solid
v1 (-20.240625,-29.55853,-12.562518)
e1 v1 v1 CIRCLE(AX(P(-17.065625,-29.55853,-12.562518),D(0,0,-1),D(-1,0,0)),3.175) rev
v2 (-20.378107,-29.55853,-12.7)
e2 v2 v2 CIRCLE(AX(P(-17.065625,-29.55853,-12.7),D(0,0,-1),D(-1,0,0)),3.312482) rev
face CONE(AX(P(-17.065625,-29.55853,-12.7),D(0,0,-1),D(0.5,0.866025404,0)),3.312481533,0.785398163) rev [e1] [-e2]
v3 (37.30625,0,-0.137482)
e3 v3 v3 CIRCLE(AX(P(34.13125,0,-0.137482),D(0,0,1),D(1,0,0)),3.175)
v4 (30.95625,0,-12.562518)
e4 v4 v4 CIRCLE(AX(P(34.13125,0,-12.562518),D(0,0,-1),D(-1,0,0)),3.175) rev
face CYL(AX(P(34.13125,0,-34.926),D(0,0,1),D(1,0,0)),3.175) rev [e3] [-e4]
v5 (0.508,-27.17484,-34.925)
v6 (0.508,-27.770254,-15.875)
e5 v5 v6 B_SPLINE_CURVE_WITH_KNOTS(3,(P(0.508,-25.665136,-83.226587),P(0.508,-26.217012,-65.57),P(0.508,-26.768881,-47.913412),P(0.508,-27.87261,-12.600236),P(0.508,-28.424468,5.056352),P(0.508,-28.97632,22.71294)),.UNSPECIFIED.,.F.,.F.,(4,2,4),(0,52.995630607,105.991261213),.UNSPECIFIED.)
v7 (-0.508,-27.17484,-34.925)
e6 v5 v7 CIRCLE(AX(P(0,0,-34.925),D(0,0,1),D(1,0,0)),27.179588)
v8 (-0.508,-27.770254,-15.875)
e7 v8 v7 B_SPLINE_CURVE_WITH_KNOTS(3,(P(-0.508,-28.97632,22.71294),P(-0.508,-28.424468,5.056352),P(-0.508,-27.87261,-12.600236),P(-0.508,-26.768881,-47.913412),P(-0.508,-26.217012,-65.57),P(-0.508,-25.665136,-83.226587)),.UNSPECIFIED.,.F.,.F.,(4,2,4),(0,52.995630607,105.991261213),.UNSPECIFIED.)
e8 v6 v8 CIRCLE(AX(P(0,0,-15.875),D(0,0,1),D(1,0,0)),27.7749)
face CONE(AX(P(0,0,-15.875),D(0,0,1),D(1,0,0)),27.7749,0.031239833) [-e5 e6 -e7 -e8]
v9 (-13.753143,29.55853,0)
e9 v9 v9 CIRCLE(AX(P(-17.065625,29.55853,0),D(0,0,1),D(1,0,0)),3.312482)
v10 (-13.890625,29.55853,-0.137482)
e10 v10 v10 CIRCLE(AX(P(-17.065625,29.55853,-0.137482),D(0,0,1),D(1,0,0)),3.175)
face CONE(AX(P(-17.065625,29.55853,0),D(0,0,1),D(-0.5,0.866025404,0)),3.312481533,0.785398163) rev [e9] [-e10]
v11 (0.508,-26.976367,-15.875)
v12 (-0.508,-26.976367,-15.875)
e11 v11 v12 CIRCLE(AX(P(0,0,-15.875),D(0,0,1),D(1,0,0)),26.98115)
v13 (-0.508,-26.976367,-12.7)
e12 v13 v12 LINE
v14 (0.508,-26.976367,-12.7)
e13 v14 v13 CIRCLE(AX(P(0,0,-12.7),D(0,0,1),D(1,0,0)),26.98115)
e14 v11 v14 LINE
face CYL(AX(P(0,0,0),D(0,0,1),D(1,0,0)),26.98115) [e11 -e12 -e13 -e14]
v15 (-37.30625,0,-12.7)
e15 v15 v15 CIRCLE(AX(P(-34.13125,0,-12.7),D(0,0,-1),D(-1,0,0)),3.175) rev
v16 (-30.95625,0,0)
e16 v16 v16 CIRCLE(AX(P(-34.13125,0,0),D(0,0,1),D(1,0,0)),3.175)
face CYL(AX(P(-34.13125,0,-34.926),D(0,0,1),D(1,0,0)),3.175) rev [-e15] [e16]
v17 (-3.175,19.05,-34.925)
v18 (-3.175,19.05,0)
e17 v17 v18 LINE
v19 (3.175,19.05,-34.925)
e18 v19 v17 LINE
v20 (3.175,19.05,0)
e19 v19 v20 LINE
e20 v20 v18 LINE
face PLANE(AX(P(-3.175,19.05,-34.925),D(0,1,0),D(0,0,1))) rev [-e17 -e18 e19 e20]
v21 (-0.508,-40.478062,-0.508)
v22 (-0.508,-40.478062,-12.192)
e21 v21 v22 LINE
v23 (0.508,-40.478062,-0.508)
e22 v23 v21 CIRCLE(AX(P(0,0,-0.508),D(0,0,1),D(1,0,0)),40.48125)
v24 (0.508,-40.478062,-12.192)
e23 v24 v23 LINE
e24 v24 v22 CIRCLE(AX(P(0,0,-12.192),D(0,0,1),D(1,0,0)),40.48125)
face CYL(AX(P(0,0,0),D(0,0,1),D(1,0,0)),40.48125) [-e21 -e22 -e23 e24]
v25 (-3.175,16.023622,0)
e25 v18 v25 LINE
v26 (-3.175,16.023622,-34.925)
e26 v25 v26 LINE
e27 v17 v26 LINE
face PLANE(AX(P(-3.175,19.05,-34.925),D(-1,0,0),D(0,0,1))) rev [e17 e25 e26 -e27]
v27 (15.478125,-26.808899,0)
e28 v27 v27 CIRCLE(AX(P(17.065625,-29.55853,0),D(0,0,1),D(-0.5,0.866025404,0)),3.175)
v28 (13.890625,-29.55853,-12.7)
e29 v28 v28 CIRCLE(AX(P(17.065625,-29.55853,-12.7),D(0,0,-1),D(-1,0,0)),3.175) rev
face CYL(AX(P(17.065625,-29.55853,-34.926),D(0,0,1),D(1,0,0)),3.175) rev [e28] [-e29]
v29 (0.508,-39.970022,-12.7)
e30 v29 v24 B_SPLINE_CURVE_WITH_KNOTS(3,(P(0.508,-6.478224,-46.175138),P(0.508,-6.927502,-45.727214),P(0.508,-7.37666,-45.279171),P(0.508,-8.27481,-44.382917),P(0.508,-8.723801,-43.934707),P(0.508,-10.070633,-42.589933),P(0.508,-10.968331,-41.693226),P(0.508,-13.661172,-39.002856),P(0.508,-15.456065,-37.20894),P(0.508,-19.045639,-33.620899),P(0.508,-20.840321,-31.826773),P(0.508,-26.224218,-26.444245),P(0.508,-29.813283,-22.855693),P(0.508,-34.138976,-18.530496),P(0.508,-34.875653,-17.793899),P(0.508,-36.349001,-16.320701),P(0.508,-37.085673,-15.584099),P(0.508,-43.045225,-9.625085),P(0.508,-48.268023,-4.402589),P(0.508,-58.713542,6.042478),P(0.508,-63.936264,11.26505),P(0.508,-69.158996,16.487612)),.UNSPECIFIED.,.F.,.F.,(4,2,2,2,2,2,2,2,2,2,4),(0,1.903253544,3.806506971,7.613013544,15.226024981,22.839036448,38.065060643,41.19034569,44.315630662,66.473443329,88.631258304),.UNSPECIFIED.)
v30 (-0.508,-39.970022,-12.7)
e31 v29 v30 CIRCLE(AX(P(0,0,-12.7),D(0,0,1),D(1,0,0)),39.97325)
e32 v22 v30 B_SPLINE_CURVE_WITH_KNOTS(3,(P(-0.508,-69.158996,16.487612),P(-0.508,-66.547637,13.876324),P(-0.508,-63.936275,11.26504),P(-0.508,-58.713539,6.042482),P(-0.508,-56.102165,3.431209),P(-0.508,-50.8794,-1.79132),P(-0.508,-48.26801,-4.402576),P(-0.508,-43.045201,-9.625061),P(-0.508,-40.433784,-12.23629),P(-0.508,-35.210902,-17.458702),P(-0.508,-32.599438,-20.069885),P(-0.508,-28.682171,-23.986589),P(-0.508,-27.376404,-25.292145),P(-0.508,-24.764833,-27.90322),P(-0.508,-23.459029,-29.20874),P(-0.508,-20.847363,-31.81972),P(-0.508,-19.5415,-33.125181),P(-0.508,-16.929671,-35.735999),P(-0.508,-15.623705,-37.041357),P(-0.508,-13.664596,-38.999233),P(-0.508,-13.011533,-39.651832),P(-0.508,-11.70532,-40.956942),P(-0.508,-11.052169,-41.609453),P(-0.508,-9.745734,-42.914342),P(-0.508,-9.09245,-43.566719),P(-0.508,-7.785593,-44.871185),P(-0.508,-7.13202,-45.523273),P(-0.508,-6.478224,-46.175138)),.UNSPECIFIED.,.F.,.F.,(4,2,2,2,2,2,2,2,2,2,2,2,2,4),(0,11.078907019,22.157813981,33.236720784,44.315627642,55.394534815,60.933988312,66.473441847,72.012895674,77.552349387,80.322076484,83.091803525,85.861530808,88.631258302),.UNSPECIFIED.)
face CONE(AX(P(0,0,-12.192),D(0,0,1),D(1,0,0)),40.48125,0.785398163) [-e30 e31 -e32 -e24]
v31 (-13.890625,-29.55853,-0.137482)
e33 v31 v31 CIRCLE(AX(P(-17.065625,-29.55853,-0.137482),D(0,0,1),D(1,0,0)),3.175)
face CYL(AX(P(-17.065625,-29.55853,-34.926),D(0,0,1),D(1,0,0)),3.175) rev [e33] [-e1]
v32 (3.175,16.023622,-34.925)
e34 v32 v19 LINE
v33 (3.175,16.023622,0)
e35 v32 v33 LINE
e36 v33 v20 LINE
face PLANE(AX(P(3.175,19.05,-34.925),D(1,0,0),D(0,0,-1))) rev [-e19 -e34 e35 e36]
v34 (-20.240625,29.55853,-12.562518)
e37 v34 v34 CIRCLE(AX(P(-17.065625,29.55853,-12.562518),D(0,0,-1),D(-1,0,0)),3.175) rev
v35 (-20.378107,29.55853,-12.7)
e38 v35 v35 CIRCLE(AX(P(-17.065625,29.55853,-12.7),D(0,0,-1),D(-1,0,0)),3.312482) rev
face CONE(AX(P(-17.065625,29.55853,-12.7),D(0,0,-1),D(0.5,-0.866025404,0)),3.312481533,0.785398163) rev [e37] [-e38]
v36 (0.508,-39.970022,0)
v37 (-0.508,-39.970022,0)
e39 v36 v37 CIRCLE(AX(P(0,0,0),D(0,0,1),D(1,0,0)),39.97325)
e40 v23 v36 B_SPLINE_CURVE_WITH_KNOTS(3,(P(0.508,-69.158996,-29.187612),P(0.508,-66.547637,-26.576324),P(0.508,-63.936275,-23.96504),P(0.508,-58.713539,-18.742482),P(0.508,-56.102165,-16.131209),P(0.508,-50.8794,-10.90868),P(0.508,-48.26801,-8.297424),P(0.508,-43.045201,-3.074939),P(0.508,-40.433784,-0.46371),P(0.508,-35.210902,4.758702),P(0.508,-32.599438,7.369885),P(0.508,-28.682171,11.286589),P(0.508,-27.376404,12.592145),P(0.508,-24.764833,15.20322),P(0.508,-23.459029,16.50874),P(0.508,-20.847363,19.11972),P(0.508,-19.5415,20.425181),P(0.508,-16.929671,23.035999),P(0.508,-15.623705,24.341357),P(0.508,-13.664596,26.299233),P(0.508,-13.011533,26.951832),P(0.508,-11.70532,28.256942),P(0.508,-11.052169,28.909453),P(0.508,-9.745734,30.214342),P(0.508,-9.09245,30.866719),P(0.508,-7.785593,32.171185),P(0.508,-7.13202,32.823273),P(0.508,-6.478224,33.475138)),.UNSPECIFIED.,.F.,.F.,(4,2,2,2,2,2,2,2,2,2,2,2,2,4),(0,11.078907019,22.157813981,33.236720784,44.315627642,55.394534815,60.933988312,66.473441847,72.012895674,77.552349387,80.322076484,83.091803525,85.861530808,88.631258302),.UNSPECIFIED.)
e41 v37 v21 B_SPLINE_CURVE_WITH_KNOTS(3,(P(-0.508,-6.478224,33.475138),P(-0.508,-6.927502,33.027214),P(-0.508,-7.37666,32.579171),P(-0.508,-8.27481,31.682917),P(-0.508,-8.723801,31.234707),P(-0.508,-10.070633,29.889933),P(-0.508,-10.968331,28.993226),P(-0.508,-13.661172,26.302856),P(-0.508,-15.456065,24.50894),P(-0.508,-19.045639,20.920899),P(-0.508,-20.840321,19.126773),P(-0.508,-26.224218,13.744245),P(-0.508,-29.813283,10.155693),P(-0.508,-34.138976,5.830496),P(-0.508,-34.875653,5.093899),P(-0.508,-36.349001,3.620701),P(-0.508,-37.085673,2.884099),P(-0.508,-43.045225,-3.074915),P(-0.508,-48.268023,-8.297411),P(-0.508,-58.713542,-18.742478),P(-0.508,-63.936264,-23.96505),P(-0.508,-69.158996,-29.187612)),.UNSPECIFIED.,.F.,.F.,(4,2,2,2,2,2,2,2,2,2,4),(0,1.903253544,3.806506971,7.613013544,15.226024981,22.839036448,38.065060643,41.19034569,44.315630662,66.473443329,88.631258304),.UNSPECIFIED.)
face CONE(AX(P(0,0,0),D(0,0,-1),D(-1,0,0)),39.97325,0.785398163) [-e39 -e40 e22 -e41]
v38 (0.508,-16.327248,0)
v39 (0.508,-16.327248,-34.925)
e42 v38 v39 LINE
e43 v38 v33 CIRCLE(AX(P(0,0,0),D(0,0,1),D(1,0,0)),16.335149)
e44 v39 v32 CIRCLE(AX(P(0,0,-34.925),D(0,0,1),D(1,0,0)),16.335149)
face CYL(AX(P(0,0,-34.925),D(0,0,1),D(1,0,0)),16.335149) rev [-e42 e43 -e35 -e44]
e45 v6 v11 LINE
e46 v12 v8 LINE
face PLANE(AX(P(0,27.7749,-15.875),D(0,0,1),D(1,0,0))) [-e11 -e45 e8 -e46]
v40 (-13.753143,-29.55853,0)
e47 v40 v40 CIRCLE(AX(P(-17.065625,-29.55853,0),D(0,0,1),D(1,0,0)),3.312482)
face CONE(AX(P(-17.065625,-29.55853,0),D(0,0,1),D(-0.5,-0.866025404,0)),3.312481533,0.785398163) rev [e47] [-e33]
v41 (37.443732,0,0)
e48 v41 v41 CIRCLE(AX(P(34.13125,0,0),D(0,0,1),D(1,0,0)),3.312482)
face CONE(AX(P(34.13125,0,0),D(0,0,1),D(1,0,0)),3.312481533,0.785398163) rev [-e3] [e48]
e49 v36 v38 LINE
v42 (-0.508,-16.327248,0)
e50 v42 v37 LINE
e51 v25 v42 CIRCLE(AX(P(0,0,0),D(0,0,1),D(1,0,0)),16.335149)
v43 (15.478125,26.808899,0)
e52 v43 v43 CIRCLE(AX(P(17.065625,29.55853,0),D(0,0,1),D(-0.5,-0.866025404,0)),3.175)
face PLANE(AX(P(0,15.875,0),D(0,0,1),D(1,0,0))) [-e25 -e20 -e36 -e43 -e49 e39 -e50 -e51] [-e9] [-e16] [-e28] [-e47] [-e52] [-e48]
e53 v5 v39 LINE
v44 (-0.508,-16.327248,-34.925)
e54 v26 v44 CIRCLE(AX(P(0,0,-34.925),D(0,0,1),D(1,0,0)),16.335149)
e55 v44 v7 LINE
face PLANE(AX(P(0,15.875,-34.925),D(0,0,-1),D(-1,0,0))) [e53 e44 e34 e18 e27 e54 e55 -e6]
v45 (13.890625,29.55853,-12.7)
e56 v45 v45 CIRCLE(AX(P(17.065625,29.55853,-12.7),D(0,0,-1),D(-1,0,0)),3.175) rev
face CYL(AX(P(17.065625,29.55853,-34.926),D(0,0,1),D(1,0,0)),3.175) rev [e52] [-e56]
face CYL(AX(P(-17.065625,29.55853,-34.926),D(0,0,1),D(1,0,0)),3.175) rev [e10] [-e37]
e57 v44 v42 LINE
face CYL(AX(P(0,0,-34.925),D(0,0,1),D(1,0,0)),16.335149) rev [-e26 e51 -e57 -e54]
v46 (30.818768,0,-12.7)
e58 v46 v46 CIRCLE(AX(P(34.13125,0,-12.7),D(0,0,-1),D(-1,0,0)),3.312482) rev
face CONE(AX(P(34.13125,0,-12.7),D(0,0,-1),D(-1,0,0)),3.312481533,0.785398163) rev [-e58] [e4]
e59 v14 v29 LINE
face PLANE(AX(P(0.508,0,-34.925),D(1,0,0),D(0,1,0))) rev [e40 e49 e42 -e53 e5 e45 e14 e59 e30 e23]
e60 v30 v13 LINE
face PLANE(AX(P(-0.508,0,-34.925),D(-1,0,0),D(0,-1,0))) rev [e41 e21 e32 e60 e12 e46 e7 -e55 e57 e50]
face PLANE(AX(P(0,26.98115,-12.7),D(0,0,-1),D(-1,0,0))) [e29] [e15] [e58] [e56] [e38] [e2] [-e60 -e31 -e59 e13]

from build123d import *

# Parameters (mm, degrees)
SKETCH3_W           = 1.016
SKETCH3_H           = 40.48125
CUT_EXTRUDE1_DEPTH  = 68.06130649
CUT_EXTRUDE2_REACH  = 69.061
SKETCH4_R           = 3.175
CIRPATTERN1_COUNT   = 3
SKETCH16_W          = 6.35
SKETCH16_H          = 6.35
CUT_EXTRUDE7_DEPTH  = 68.06130649
SKETCH24_R          = 16.335149264
CUT_EXTRUDE13_DEPTH = 68.06130649


# Read off the part's stored shape, not the designer's step: Cut-Extrude3, Cut-Extrude4
with BuildPart() as part:
    # Sketch1 → Revolve1 (revolve)
    with BuildSketch(Plane(origin=(0, 0, 0), x_dir=(0, 0, -1), z_dir=(1, 0, 0)), mode=Mode.PRIVATE) as revolve1_sk:
        Polygon((34.925, -27.1795875), (15.875, -27.7749), (15.875, -26.98115), (12.7, -26.98115), (12.7, -39.97325), (12.192, -40.48125), (0.508, -40.48125), (0, -39.97325), (0, -15.875), (34.925, -15.875), align=None)
    revolve(revolve1_sk.sketch.rotate(Axis((0, 0, 0), (0, 0, -1)), 270), axis=Axis((0, 0, 0), (0, 0, -1)))

    # Sketch3 → Cut-Extrude1 (cut, through all)
    with BuildSketch(Plane.XY):
        with Locations((0, -20.240625)):
            Rectangle(SKETCH3_W, SKETCH3_H)
    extrude(amount=-CUT_EXTRUDE1_DEPTH, mode=Mode.SUBTRACT)

    # Sketch4 → Cut-Extrude2 (cut, up to next)
    with BuildSketch(Plane.XY, mode=Mode.PRIVATE) as cut_extrude2_sk1:
        with Locations((34.13125, 0)):
            Circle(SKETCH4_R)
    cut_extrude2_tool1 = extrude(cut_extrude2_sk1.sketch, amount=-CUT_EXTRUDE2_REACH, mode=Mode.PRIVATE) & part.part
    # Sketch4 → Cut-Extrude2 (cut, up to next)
    with BuildSketch(Plane.XY, mode=Mode.PRIVATE) as cut_extrude2_sk2:
        with Locations((-34.13125, 0)):
            Circle(SKETCH4_R)
    cut_extrude2_tool2 = extrude(cut_extrude2_sk2.sketch, amount=-CUT_EXTRUDE2_REACH, mode=Mode.PRIVATE) & part.part
    cut_extrude2_1 = cut_extrude2_tool1.solids().sort_by_distance((34.13125, 0, 0))[0]
    add(cut_extrude2_1, mode=Mode.SUBTRACT)
    cut_extrude2_2 = cut_extrude2_tool2.solids().sort_by_distance((-34.13125, 0, 0))[0]
    add(cut_extrude2_2, mode=Mode.SUBTRACT)
    cut_extrude2 = cut_extrude2_1 + cut_extrude2_2  # Cut-Extrude2 as one shape, for the pattern or mirror that repeats it

    # Cut-Extrude3 outline → Cut-Extrude3 (revolve, cut)
    with BuildSketch(Plane(origin=(34.13125, 0, 0), x_dir=(1, 0, 0), z_dir=(0, -1, 0))):
        Polygon((3.175, 0), (3.175, -0.137481533), (3.312481533, 0), align=None)
    cut_extrude3 = revolve(axis=Axis((34.13125, 0, 0), (0, 0, 1)), mode=Mode.SUBTRACT)

    # Cut-Extrude4 outline → Cut-Extrude4 (revolve, cut)
    with BuildSketch(Plane(origin=(34.13125, 0, 0), x_dir=(1, 0, 0), z_dir=(0, -1, 0))):
        Polygon((3.312481533, -12.7), (3.175, -12.562518467), (3.175, -12.7), align=None)
    cut_extrude4 = revolve(axis=Axis((34.13125, 0, 0), (0, 0, 1)), mode=Mode.SUBTRACT)

    # CirPattern1: Cut-Extrude2, Cut-Extrude3, Cut-Extrude4 ×3 about axis
    cirpattern1_axis = Axis((0, 0, 0), (0, 0, 1))
    add([cut_extrude2.rotate(cirpattern1_axis, i * 360 / CIRPATTERN1_COUNT) for i in range(1, CIRPATTERN1_COUNT)], mode=Mode.SUBTRACT)
    add([cut_extrude3.rotate(cirpattern1_axis, i * 360 / CIRPATTERN1_COUNT) for i in range(1, CIRPATTERN1_COUNT)], mode=Mode.SUBTRACT)
    add([cut_extrude4.rotate(cirpattern1_axis, i * 360 / CIRPATTERN1_COUNT) for i in range(1, CIRPATTERN1_COUNT)], mode=Mode.SUBTRACT)

    # Sketch16 → Cut-Extrude7 (cut, through all)
    with BuildSketch(Plane.XY):
        with Locations((0, 15.875)):
            Rectangle(SKETCH16_W, SKETCH16_H)
    extrude(amount=-CUT_EXTRUDE7_DEPTH, mode=Mode.SUBTRACT)

    # Sketch24 → Cut-Extrude13 (cut, through all)
    with BuildSketch(Plane.XY):
        Circle(SKETCH24_R)
    extrude(amount=-CUT_EXTRUDE13_DEPTH, mode=Mode.SUBTRACT)


solid = part.part
